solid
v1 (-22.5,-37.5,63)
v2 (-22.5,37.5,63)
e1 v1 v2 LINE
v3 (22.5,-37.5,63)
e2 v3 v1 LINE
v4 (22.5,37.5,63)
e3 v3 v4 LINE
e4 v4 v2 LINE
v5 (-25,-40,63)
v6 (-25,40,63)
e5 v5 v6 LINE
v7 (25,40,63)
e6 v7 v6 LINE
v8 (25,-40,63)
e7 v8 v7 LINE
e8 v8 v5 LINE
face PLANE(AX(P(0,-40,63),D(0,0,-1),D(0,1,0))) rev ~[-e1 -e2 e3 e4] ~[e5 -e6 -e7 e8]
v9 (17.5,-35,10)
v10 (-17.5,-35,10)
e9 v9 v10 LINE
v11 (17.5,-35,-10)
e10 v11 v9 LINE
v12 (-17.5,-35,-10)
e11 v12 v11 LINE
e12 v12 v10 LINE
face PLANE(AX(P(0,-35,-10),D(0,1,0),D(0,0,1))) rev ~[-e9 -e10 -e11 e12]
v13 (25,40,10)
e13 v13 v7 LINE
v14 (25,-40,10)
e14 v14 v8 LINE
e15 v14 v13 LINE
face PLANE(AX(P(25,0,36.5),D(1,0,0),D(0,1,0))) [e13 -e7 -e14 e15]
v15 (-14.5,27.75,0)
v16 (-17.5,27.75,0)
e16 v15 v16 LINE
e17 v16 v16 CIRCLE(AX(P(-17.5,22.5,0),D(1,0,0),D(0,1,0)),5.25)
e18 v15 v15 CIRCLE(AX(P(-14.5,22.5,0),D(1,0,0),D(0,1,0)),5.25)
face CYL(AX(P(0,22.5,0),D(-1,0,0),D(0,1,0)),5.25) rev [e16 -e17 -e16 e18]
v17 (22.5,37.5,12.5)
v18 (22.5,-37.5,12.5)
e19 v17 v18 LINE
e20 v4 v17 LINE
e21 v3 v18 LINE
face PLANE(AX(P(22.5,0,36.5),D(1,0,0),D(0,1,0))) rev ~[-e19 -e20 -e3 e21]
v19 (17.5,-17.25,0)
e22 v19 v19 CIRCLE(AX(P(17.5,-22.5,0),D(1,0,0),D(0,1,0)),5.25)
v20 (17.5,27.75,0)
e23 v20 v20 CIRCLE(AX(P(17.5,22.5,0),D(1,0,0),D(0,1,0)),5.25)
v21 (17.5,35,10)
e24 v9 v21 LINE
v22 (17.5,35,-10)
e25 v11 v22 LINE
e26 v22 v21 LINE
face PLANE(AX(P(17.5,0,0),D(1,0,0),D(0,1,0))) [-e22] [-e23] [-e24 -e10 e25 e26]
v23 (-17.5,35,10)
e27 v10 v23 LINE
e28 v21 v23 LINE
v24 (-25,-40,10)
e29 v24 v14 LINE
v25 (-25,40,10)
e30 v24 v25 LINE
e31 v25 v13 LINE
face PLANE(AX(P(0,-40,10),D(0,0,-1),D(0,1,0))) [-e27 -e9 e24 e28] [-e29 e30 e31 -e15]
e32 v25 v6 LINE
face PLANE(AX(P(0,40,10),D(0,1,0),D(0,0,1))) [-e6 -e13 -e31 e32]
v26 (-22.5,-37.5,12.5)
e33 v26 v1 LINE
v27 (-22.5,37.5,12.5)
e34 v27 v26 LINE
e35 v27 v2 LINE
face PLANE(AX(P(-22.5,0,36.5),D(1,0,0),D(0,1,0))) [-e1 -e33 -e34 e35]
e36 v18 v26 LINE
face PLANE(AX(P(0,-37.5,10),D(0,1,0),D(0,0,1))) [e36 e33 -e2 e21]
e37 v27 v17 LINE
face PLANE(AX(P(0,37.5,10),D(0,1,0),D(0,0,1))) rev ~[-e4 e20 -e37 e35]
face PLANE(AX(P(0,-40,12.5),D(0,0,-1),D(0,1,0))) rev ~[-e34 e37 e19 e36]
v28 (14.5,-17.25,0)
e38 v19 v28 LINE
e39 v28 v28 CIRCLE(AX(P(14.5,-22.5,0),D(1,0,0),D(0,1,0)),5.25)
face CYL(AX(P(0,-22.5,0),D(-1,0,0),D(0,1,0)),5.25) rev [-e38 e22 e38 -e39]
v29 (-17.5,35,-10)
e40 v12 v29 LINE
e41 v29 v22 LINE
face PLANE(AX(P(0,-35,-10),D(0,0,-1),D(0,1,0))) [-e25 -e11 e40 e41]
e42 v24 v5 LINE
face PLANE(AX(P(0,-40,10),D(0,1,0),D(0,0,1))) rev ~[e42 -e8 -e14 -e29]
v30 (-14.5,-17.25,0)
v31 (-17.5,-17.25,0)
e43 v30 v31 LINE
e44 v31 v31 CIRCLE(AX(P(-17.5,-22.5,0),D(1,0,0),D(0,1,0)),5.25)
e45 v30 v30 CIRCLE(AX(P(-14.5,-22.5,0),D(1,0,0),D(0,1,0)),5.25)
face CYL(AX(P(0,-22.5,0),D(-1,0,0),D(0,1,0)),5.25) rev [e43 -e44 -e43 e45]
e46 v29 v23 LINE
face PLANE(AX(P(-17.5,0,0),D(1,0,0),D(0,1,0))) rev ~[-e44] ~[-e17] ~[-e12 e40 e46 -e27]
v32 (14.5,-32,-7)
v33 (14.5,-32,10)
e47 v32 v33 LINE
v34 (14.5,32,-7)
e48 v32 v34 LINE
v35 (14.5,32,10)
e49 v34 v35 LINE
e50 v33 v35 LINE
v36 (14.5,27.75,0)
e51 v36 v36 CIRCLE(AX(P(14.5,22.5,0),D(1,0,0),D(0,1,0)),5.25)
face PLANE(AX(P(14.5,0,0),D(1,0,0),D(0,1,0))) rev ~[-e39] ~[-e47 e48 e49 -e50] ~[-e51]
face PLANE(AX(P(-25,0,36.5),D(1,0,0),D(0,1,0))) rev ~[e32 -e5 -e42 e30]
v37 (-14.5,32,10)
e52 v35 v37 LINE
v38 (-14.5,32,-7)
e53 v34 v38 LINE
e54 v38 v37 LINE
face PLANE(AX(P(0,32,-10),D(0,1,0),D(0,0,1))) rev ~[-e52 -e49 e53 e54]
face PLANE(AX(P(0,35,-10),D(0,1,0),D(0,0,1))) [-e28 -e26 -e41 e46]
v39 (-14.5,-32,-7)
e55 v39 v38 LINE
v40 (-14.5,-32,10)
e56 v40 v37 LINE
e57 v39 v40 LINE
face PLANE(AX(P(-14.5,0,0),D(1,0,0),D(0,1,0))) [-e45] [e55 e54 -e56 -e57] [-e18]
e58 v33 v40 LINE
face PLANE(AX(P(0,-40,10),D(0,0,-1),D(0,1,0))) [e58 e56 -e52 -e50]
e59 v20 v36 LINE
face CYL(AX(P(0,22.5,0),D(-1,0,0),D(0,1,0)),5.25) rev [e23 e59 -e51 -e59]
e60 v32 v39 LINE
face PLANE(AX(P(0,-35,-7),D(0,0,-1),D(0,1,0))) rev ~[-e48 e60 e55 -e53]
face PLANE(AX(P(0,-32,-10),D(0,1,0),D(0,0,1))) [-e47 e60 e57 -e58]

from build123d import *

# Parameters (mm, degrees)
F0_W         = 70
F0_H         = 20
F0_R         = 5.25
F1_DEPTH     = 17.5
F2_T         = -3
F3_W         = 80
F3_H         = 53
F4_DEPTH     = 25
F5_T         = 2.5
F5_T3_DEPTH  = 40
F5_T5_DEPTH  = 75
F5_T7_DEPTH  = 69
F5_T9_DEPTH  = 22
F5_T11_DEPTH = 34


# Not quite as in the source:
# - a shell that OpenCascade refuses in one call is made with other operations: the cavity is built on its own and cut out


with BuildPart() as f1:
    # F0 (on Right) → F1 (new body, symmetric)
    with BuildSketch(Plane.YZ):
        Rectangle(F0_W, F0_H)
        with Locations((-22.5, 0)):
            Circle(F0_R, mode=Mode.SUBTRACT)
        with Locations((22.5, 0)):
            Circle(F0_R, mode=Mode.SUBTRACT)
    extrude(amount=F1_DEPTH, both=True)

    # F2
    f2_openings = [f1.faces().sort_by_distance(p)[0] for p in [
        (0, 0, 10),
        (0, -27.75, 0),
        (0, 17.25, 0),
    ]]
    offset(amount=F2_T, openings=f2_openings)

    # F3 (on Right) → F4 (join, symmetric)
    with BuildSketch(Plane.YZ):
        with Locations((0, 36.5)):
            Rectangle(F3_W, F3_H)
    extrude(amount=F4_DEPTH, both=True)

    # F5: shell of thickness 2.5, made by hand


with BuildPart() as f5_core1:
    # F5_t2: copy of F1
    add(f1.part)

    # the walls: a layer under each face that stays
    f5_faces = [f5_core1.faces().sort_by_distance(p)[0] for p in [
        (-21.4285714286, -34.2857142857, 10),
        (-25, 0, 36.5),
        (0, -40, 36.5),
        (0, 40, 36.5),
        (25, 0, 36.5),
        (0, 35, 0),
        (17.5, 0, 0),
        (0, -35, 0),
        (-17.5, 0, 0),
        (0, 0, -10),
        (16, -27.75, 0),
        (16, 17.25, 0),
        (-16, -27.75, 0),
        (-16, 17.25, 0),
        (14.5, 0, 1.5),
        (-14.5, 0, 1.5),
        (0, 0, 10),
        (0, -32, 1.5),
        (0, 0, -7),
        (0, 32, 1.5),
    ]]
    thicken(f5_faces, amount=-F5_T, mode=Mode.SUBTRACT)

    # F5_s4 → F5_t3 (cut)
    with BuildSketch(Plane.YZ.offset(-20)):
        Polygon((35.025, 9.975), (35, 12.5), (32.5, 12.5), (32.5, 10), align=None)
        Polygon((-35.025, 9.975), (-35, 12.5), (-32.5, 12.5), (-32.5, 10), align=None)
    extrude(amount=F5_T3_DEPTH, mode=Mode.SUBTRACT)

    # F5_s6 → F5_t5 (cut)
    with BuildSketch(Plane.XZ.offset(-37.5)):
        Polygon((17.525, 9.975), (17.5, 12.5), (15, 12.5), (15, 10), align=None)
        Polygon((-17.525, 9.975), (-17.5, 12.5), (-15, 12.5), (-15, 10), align=None)
    extrude(amount=F5_T5_DEPTH, mode=Mode.SUBTRACT)

    # F5_s8 → F5_t7 (cut)
    with BuildSketch(Plane.XZ.offset(-34.5)):
        Polygon((14.475, 9.975), (17, 10), (17, 12.5), (14.5, 12.5), align=None)
        Polygon((14.475, -6.975), (17, -7), (17, -9.5), (14.5, -9.5), align=None)
        Polygon((-14.475, 9.975), (-17, 10), (-17, 12.5), (-14.5, 12.5), align=None)
        Polygon((-14.475, -6.975), (-17, -7), (-17, -9.5), (-14.5, -9.5), align=None)
    extrude(amount=F5_T7_DEPTH, mode=Mode.SUBTRACT)

    # F5_s10 → F5_t9 (cut)
    with BuildSketch(Plane.XY.offset(-9.5)):
        Polygon((14.475, -31.975), (17, -32), (17, -34.5), (14.5, -34.5), align=None)
        Polygon((14.475, 31.975), (17, 32), (17, 34.5), (14.5, 34.5), align=None)
        Polygon((-14.475, -31.975), (-17, -32), (-17, -34.5), (-14.5, -34.5), align=None)
        Polygon((-14.475, 31.975), (-17, 32), (-17, 34.5), (-14.5, 34.5), align=None)
    extrude(amount=F5_T9_DEPTH, mode=Mode.SUBTRACT)

    # F5_s12 → F5_t11 (cut)
    with BuildSketch(Plane.YZ.offset(-17)):
        Polygon((-31.975, 9.975), (-32, 12.5), (-34.5, 12.5), (-34.5, 10), align=None)
        Polygon((31.975, 9.975), (32, 12.5), (34.5, 12.5), (34.5, 10), align=None)
        Polygon((-31.975, -6.975), (-34.5, -7), (-34.5, -9.5), (-32, -9.5), align=None)
        Polygon((31.975, -6.975), (32, -9.5), (34.5, -9.5), (34.5, -7), align=None)
    extrude(amount=F5_T11_DEPTH, mode=Mode.SUBTRACT)


with BuildPart() as f1_1:
    add(f1.part)

    # what is left inside the walls is the cavity
    f5_cavity = [f5_core1.part.solids().sort_by_distance(p)[0] for p in [
        (22.475, 0, 29.333333),
    ]]
    add(f5_cavity, mode=Mode.SUBTRACT)


solid = f1_1.part
